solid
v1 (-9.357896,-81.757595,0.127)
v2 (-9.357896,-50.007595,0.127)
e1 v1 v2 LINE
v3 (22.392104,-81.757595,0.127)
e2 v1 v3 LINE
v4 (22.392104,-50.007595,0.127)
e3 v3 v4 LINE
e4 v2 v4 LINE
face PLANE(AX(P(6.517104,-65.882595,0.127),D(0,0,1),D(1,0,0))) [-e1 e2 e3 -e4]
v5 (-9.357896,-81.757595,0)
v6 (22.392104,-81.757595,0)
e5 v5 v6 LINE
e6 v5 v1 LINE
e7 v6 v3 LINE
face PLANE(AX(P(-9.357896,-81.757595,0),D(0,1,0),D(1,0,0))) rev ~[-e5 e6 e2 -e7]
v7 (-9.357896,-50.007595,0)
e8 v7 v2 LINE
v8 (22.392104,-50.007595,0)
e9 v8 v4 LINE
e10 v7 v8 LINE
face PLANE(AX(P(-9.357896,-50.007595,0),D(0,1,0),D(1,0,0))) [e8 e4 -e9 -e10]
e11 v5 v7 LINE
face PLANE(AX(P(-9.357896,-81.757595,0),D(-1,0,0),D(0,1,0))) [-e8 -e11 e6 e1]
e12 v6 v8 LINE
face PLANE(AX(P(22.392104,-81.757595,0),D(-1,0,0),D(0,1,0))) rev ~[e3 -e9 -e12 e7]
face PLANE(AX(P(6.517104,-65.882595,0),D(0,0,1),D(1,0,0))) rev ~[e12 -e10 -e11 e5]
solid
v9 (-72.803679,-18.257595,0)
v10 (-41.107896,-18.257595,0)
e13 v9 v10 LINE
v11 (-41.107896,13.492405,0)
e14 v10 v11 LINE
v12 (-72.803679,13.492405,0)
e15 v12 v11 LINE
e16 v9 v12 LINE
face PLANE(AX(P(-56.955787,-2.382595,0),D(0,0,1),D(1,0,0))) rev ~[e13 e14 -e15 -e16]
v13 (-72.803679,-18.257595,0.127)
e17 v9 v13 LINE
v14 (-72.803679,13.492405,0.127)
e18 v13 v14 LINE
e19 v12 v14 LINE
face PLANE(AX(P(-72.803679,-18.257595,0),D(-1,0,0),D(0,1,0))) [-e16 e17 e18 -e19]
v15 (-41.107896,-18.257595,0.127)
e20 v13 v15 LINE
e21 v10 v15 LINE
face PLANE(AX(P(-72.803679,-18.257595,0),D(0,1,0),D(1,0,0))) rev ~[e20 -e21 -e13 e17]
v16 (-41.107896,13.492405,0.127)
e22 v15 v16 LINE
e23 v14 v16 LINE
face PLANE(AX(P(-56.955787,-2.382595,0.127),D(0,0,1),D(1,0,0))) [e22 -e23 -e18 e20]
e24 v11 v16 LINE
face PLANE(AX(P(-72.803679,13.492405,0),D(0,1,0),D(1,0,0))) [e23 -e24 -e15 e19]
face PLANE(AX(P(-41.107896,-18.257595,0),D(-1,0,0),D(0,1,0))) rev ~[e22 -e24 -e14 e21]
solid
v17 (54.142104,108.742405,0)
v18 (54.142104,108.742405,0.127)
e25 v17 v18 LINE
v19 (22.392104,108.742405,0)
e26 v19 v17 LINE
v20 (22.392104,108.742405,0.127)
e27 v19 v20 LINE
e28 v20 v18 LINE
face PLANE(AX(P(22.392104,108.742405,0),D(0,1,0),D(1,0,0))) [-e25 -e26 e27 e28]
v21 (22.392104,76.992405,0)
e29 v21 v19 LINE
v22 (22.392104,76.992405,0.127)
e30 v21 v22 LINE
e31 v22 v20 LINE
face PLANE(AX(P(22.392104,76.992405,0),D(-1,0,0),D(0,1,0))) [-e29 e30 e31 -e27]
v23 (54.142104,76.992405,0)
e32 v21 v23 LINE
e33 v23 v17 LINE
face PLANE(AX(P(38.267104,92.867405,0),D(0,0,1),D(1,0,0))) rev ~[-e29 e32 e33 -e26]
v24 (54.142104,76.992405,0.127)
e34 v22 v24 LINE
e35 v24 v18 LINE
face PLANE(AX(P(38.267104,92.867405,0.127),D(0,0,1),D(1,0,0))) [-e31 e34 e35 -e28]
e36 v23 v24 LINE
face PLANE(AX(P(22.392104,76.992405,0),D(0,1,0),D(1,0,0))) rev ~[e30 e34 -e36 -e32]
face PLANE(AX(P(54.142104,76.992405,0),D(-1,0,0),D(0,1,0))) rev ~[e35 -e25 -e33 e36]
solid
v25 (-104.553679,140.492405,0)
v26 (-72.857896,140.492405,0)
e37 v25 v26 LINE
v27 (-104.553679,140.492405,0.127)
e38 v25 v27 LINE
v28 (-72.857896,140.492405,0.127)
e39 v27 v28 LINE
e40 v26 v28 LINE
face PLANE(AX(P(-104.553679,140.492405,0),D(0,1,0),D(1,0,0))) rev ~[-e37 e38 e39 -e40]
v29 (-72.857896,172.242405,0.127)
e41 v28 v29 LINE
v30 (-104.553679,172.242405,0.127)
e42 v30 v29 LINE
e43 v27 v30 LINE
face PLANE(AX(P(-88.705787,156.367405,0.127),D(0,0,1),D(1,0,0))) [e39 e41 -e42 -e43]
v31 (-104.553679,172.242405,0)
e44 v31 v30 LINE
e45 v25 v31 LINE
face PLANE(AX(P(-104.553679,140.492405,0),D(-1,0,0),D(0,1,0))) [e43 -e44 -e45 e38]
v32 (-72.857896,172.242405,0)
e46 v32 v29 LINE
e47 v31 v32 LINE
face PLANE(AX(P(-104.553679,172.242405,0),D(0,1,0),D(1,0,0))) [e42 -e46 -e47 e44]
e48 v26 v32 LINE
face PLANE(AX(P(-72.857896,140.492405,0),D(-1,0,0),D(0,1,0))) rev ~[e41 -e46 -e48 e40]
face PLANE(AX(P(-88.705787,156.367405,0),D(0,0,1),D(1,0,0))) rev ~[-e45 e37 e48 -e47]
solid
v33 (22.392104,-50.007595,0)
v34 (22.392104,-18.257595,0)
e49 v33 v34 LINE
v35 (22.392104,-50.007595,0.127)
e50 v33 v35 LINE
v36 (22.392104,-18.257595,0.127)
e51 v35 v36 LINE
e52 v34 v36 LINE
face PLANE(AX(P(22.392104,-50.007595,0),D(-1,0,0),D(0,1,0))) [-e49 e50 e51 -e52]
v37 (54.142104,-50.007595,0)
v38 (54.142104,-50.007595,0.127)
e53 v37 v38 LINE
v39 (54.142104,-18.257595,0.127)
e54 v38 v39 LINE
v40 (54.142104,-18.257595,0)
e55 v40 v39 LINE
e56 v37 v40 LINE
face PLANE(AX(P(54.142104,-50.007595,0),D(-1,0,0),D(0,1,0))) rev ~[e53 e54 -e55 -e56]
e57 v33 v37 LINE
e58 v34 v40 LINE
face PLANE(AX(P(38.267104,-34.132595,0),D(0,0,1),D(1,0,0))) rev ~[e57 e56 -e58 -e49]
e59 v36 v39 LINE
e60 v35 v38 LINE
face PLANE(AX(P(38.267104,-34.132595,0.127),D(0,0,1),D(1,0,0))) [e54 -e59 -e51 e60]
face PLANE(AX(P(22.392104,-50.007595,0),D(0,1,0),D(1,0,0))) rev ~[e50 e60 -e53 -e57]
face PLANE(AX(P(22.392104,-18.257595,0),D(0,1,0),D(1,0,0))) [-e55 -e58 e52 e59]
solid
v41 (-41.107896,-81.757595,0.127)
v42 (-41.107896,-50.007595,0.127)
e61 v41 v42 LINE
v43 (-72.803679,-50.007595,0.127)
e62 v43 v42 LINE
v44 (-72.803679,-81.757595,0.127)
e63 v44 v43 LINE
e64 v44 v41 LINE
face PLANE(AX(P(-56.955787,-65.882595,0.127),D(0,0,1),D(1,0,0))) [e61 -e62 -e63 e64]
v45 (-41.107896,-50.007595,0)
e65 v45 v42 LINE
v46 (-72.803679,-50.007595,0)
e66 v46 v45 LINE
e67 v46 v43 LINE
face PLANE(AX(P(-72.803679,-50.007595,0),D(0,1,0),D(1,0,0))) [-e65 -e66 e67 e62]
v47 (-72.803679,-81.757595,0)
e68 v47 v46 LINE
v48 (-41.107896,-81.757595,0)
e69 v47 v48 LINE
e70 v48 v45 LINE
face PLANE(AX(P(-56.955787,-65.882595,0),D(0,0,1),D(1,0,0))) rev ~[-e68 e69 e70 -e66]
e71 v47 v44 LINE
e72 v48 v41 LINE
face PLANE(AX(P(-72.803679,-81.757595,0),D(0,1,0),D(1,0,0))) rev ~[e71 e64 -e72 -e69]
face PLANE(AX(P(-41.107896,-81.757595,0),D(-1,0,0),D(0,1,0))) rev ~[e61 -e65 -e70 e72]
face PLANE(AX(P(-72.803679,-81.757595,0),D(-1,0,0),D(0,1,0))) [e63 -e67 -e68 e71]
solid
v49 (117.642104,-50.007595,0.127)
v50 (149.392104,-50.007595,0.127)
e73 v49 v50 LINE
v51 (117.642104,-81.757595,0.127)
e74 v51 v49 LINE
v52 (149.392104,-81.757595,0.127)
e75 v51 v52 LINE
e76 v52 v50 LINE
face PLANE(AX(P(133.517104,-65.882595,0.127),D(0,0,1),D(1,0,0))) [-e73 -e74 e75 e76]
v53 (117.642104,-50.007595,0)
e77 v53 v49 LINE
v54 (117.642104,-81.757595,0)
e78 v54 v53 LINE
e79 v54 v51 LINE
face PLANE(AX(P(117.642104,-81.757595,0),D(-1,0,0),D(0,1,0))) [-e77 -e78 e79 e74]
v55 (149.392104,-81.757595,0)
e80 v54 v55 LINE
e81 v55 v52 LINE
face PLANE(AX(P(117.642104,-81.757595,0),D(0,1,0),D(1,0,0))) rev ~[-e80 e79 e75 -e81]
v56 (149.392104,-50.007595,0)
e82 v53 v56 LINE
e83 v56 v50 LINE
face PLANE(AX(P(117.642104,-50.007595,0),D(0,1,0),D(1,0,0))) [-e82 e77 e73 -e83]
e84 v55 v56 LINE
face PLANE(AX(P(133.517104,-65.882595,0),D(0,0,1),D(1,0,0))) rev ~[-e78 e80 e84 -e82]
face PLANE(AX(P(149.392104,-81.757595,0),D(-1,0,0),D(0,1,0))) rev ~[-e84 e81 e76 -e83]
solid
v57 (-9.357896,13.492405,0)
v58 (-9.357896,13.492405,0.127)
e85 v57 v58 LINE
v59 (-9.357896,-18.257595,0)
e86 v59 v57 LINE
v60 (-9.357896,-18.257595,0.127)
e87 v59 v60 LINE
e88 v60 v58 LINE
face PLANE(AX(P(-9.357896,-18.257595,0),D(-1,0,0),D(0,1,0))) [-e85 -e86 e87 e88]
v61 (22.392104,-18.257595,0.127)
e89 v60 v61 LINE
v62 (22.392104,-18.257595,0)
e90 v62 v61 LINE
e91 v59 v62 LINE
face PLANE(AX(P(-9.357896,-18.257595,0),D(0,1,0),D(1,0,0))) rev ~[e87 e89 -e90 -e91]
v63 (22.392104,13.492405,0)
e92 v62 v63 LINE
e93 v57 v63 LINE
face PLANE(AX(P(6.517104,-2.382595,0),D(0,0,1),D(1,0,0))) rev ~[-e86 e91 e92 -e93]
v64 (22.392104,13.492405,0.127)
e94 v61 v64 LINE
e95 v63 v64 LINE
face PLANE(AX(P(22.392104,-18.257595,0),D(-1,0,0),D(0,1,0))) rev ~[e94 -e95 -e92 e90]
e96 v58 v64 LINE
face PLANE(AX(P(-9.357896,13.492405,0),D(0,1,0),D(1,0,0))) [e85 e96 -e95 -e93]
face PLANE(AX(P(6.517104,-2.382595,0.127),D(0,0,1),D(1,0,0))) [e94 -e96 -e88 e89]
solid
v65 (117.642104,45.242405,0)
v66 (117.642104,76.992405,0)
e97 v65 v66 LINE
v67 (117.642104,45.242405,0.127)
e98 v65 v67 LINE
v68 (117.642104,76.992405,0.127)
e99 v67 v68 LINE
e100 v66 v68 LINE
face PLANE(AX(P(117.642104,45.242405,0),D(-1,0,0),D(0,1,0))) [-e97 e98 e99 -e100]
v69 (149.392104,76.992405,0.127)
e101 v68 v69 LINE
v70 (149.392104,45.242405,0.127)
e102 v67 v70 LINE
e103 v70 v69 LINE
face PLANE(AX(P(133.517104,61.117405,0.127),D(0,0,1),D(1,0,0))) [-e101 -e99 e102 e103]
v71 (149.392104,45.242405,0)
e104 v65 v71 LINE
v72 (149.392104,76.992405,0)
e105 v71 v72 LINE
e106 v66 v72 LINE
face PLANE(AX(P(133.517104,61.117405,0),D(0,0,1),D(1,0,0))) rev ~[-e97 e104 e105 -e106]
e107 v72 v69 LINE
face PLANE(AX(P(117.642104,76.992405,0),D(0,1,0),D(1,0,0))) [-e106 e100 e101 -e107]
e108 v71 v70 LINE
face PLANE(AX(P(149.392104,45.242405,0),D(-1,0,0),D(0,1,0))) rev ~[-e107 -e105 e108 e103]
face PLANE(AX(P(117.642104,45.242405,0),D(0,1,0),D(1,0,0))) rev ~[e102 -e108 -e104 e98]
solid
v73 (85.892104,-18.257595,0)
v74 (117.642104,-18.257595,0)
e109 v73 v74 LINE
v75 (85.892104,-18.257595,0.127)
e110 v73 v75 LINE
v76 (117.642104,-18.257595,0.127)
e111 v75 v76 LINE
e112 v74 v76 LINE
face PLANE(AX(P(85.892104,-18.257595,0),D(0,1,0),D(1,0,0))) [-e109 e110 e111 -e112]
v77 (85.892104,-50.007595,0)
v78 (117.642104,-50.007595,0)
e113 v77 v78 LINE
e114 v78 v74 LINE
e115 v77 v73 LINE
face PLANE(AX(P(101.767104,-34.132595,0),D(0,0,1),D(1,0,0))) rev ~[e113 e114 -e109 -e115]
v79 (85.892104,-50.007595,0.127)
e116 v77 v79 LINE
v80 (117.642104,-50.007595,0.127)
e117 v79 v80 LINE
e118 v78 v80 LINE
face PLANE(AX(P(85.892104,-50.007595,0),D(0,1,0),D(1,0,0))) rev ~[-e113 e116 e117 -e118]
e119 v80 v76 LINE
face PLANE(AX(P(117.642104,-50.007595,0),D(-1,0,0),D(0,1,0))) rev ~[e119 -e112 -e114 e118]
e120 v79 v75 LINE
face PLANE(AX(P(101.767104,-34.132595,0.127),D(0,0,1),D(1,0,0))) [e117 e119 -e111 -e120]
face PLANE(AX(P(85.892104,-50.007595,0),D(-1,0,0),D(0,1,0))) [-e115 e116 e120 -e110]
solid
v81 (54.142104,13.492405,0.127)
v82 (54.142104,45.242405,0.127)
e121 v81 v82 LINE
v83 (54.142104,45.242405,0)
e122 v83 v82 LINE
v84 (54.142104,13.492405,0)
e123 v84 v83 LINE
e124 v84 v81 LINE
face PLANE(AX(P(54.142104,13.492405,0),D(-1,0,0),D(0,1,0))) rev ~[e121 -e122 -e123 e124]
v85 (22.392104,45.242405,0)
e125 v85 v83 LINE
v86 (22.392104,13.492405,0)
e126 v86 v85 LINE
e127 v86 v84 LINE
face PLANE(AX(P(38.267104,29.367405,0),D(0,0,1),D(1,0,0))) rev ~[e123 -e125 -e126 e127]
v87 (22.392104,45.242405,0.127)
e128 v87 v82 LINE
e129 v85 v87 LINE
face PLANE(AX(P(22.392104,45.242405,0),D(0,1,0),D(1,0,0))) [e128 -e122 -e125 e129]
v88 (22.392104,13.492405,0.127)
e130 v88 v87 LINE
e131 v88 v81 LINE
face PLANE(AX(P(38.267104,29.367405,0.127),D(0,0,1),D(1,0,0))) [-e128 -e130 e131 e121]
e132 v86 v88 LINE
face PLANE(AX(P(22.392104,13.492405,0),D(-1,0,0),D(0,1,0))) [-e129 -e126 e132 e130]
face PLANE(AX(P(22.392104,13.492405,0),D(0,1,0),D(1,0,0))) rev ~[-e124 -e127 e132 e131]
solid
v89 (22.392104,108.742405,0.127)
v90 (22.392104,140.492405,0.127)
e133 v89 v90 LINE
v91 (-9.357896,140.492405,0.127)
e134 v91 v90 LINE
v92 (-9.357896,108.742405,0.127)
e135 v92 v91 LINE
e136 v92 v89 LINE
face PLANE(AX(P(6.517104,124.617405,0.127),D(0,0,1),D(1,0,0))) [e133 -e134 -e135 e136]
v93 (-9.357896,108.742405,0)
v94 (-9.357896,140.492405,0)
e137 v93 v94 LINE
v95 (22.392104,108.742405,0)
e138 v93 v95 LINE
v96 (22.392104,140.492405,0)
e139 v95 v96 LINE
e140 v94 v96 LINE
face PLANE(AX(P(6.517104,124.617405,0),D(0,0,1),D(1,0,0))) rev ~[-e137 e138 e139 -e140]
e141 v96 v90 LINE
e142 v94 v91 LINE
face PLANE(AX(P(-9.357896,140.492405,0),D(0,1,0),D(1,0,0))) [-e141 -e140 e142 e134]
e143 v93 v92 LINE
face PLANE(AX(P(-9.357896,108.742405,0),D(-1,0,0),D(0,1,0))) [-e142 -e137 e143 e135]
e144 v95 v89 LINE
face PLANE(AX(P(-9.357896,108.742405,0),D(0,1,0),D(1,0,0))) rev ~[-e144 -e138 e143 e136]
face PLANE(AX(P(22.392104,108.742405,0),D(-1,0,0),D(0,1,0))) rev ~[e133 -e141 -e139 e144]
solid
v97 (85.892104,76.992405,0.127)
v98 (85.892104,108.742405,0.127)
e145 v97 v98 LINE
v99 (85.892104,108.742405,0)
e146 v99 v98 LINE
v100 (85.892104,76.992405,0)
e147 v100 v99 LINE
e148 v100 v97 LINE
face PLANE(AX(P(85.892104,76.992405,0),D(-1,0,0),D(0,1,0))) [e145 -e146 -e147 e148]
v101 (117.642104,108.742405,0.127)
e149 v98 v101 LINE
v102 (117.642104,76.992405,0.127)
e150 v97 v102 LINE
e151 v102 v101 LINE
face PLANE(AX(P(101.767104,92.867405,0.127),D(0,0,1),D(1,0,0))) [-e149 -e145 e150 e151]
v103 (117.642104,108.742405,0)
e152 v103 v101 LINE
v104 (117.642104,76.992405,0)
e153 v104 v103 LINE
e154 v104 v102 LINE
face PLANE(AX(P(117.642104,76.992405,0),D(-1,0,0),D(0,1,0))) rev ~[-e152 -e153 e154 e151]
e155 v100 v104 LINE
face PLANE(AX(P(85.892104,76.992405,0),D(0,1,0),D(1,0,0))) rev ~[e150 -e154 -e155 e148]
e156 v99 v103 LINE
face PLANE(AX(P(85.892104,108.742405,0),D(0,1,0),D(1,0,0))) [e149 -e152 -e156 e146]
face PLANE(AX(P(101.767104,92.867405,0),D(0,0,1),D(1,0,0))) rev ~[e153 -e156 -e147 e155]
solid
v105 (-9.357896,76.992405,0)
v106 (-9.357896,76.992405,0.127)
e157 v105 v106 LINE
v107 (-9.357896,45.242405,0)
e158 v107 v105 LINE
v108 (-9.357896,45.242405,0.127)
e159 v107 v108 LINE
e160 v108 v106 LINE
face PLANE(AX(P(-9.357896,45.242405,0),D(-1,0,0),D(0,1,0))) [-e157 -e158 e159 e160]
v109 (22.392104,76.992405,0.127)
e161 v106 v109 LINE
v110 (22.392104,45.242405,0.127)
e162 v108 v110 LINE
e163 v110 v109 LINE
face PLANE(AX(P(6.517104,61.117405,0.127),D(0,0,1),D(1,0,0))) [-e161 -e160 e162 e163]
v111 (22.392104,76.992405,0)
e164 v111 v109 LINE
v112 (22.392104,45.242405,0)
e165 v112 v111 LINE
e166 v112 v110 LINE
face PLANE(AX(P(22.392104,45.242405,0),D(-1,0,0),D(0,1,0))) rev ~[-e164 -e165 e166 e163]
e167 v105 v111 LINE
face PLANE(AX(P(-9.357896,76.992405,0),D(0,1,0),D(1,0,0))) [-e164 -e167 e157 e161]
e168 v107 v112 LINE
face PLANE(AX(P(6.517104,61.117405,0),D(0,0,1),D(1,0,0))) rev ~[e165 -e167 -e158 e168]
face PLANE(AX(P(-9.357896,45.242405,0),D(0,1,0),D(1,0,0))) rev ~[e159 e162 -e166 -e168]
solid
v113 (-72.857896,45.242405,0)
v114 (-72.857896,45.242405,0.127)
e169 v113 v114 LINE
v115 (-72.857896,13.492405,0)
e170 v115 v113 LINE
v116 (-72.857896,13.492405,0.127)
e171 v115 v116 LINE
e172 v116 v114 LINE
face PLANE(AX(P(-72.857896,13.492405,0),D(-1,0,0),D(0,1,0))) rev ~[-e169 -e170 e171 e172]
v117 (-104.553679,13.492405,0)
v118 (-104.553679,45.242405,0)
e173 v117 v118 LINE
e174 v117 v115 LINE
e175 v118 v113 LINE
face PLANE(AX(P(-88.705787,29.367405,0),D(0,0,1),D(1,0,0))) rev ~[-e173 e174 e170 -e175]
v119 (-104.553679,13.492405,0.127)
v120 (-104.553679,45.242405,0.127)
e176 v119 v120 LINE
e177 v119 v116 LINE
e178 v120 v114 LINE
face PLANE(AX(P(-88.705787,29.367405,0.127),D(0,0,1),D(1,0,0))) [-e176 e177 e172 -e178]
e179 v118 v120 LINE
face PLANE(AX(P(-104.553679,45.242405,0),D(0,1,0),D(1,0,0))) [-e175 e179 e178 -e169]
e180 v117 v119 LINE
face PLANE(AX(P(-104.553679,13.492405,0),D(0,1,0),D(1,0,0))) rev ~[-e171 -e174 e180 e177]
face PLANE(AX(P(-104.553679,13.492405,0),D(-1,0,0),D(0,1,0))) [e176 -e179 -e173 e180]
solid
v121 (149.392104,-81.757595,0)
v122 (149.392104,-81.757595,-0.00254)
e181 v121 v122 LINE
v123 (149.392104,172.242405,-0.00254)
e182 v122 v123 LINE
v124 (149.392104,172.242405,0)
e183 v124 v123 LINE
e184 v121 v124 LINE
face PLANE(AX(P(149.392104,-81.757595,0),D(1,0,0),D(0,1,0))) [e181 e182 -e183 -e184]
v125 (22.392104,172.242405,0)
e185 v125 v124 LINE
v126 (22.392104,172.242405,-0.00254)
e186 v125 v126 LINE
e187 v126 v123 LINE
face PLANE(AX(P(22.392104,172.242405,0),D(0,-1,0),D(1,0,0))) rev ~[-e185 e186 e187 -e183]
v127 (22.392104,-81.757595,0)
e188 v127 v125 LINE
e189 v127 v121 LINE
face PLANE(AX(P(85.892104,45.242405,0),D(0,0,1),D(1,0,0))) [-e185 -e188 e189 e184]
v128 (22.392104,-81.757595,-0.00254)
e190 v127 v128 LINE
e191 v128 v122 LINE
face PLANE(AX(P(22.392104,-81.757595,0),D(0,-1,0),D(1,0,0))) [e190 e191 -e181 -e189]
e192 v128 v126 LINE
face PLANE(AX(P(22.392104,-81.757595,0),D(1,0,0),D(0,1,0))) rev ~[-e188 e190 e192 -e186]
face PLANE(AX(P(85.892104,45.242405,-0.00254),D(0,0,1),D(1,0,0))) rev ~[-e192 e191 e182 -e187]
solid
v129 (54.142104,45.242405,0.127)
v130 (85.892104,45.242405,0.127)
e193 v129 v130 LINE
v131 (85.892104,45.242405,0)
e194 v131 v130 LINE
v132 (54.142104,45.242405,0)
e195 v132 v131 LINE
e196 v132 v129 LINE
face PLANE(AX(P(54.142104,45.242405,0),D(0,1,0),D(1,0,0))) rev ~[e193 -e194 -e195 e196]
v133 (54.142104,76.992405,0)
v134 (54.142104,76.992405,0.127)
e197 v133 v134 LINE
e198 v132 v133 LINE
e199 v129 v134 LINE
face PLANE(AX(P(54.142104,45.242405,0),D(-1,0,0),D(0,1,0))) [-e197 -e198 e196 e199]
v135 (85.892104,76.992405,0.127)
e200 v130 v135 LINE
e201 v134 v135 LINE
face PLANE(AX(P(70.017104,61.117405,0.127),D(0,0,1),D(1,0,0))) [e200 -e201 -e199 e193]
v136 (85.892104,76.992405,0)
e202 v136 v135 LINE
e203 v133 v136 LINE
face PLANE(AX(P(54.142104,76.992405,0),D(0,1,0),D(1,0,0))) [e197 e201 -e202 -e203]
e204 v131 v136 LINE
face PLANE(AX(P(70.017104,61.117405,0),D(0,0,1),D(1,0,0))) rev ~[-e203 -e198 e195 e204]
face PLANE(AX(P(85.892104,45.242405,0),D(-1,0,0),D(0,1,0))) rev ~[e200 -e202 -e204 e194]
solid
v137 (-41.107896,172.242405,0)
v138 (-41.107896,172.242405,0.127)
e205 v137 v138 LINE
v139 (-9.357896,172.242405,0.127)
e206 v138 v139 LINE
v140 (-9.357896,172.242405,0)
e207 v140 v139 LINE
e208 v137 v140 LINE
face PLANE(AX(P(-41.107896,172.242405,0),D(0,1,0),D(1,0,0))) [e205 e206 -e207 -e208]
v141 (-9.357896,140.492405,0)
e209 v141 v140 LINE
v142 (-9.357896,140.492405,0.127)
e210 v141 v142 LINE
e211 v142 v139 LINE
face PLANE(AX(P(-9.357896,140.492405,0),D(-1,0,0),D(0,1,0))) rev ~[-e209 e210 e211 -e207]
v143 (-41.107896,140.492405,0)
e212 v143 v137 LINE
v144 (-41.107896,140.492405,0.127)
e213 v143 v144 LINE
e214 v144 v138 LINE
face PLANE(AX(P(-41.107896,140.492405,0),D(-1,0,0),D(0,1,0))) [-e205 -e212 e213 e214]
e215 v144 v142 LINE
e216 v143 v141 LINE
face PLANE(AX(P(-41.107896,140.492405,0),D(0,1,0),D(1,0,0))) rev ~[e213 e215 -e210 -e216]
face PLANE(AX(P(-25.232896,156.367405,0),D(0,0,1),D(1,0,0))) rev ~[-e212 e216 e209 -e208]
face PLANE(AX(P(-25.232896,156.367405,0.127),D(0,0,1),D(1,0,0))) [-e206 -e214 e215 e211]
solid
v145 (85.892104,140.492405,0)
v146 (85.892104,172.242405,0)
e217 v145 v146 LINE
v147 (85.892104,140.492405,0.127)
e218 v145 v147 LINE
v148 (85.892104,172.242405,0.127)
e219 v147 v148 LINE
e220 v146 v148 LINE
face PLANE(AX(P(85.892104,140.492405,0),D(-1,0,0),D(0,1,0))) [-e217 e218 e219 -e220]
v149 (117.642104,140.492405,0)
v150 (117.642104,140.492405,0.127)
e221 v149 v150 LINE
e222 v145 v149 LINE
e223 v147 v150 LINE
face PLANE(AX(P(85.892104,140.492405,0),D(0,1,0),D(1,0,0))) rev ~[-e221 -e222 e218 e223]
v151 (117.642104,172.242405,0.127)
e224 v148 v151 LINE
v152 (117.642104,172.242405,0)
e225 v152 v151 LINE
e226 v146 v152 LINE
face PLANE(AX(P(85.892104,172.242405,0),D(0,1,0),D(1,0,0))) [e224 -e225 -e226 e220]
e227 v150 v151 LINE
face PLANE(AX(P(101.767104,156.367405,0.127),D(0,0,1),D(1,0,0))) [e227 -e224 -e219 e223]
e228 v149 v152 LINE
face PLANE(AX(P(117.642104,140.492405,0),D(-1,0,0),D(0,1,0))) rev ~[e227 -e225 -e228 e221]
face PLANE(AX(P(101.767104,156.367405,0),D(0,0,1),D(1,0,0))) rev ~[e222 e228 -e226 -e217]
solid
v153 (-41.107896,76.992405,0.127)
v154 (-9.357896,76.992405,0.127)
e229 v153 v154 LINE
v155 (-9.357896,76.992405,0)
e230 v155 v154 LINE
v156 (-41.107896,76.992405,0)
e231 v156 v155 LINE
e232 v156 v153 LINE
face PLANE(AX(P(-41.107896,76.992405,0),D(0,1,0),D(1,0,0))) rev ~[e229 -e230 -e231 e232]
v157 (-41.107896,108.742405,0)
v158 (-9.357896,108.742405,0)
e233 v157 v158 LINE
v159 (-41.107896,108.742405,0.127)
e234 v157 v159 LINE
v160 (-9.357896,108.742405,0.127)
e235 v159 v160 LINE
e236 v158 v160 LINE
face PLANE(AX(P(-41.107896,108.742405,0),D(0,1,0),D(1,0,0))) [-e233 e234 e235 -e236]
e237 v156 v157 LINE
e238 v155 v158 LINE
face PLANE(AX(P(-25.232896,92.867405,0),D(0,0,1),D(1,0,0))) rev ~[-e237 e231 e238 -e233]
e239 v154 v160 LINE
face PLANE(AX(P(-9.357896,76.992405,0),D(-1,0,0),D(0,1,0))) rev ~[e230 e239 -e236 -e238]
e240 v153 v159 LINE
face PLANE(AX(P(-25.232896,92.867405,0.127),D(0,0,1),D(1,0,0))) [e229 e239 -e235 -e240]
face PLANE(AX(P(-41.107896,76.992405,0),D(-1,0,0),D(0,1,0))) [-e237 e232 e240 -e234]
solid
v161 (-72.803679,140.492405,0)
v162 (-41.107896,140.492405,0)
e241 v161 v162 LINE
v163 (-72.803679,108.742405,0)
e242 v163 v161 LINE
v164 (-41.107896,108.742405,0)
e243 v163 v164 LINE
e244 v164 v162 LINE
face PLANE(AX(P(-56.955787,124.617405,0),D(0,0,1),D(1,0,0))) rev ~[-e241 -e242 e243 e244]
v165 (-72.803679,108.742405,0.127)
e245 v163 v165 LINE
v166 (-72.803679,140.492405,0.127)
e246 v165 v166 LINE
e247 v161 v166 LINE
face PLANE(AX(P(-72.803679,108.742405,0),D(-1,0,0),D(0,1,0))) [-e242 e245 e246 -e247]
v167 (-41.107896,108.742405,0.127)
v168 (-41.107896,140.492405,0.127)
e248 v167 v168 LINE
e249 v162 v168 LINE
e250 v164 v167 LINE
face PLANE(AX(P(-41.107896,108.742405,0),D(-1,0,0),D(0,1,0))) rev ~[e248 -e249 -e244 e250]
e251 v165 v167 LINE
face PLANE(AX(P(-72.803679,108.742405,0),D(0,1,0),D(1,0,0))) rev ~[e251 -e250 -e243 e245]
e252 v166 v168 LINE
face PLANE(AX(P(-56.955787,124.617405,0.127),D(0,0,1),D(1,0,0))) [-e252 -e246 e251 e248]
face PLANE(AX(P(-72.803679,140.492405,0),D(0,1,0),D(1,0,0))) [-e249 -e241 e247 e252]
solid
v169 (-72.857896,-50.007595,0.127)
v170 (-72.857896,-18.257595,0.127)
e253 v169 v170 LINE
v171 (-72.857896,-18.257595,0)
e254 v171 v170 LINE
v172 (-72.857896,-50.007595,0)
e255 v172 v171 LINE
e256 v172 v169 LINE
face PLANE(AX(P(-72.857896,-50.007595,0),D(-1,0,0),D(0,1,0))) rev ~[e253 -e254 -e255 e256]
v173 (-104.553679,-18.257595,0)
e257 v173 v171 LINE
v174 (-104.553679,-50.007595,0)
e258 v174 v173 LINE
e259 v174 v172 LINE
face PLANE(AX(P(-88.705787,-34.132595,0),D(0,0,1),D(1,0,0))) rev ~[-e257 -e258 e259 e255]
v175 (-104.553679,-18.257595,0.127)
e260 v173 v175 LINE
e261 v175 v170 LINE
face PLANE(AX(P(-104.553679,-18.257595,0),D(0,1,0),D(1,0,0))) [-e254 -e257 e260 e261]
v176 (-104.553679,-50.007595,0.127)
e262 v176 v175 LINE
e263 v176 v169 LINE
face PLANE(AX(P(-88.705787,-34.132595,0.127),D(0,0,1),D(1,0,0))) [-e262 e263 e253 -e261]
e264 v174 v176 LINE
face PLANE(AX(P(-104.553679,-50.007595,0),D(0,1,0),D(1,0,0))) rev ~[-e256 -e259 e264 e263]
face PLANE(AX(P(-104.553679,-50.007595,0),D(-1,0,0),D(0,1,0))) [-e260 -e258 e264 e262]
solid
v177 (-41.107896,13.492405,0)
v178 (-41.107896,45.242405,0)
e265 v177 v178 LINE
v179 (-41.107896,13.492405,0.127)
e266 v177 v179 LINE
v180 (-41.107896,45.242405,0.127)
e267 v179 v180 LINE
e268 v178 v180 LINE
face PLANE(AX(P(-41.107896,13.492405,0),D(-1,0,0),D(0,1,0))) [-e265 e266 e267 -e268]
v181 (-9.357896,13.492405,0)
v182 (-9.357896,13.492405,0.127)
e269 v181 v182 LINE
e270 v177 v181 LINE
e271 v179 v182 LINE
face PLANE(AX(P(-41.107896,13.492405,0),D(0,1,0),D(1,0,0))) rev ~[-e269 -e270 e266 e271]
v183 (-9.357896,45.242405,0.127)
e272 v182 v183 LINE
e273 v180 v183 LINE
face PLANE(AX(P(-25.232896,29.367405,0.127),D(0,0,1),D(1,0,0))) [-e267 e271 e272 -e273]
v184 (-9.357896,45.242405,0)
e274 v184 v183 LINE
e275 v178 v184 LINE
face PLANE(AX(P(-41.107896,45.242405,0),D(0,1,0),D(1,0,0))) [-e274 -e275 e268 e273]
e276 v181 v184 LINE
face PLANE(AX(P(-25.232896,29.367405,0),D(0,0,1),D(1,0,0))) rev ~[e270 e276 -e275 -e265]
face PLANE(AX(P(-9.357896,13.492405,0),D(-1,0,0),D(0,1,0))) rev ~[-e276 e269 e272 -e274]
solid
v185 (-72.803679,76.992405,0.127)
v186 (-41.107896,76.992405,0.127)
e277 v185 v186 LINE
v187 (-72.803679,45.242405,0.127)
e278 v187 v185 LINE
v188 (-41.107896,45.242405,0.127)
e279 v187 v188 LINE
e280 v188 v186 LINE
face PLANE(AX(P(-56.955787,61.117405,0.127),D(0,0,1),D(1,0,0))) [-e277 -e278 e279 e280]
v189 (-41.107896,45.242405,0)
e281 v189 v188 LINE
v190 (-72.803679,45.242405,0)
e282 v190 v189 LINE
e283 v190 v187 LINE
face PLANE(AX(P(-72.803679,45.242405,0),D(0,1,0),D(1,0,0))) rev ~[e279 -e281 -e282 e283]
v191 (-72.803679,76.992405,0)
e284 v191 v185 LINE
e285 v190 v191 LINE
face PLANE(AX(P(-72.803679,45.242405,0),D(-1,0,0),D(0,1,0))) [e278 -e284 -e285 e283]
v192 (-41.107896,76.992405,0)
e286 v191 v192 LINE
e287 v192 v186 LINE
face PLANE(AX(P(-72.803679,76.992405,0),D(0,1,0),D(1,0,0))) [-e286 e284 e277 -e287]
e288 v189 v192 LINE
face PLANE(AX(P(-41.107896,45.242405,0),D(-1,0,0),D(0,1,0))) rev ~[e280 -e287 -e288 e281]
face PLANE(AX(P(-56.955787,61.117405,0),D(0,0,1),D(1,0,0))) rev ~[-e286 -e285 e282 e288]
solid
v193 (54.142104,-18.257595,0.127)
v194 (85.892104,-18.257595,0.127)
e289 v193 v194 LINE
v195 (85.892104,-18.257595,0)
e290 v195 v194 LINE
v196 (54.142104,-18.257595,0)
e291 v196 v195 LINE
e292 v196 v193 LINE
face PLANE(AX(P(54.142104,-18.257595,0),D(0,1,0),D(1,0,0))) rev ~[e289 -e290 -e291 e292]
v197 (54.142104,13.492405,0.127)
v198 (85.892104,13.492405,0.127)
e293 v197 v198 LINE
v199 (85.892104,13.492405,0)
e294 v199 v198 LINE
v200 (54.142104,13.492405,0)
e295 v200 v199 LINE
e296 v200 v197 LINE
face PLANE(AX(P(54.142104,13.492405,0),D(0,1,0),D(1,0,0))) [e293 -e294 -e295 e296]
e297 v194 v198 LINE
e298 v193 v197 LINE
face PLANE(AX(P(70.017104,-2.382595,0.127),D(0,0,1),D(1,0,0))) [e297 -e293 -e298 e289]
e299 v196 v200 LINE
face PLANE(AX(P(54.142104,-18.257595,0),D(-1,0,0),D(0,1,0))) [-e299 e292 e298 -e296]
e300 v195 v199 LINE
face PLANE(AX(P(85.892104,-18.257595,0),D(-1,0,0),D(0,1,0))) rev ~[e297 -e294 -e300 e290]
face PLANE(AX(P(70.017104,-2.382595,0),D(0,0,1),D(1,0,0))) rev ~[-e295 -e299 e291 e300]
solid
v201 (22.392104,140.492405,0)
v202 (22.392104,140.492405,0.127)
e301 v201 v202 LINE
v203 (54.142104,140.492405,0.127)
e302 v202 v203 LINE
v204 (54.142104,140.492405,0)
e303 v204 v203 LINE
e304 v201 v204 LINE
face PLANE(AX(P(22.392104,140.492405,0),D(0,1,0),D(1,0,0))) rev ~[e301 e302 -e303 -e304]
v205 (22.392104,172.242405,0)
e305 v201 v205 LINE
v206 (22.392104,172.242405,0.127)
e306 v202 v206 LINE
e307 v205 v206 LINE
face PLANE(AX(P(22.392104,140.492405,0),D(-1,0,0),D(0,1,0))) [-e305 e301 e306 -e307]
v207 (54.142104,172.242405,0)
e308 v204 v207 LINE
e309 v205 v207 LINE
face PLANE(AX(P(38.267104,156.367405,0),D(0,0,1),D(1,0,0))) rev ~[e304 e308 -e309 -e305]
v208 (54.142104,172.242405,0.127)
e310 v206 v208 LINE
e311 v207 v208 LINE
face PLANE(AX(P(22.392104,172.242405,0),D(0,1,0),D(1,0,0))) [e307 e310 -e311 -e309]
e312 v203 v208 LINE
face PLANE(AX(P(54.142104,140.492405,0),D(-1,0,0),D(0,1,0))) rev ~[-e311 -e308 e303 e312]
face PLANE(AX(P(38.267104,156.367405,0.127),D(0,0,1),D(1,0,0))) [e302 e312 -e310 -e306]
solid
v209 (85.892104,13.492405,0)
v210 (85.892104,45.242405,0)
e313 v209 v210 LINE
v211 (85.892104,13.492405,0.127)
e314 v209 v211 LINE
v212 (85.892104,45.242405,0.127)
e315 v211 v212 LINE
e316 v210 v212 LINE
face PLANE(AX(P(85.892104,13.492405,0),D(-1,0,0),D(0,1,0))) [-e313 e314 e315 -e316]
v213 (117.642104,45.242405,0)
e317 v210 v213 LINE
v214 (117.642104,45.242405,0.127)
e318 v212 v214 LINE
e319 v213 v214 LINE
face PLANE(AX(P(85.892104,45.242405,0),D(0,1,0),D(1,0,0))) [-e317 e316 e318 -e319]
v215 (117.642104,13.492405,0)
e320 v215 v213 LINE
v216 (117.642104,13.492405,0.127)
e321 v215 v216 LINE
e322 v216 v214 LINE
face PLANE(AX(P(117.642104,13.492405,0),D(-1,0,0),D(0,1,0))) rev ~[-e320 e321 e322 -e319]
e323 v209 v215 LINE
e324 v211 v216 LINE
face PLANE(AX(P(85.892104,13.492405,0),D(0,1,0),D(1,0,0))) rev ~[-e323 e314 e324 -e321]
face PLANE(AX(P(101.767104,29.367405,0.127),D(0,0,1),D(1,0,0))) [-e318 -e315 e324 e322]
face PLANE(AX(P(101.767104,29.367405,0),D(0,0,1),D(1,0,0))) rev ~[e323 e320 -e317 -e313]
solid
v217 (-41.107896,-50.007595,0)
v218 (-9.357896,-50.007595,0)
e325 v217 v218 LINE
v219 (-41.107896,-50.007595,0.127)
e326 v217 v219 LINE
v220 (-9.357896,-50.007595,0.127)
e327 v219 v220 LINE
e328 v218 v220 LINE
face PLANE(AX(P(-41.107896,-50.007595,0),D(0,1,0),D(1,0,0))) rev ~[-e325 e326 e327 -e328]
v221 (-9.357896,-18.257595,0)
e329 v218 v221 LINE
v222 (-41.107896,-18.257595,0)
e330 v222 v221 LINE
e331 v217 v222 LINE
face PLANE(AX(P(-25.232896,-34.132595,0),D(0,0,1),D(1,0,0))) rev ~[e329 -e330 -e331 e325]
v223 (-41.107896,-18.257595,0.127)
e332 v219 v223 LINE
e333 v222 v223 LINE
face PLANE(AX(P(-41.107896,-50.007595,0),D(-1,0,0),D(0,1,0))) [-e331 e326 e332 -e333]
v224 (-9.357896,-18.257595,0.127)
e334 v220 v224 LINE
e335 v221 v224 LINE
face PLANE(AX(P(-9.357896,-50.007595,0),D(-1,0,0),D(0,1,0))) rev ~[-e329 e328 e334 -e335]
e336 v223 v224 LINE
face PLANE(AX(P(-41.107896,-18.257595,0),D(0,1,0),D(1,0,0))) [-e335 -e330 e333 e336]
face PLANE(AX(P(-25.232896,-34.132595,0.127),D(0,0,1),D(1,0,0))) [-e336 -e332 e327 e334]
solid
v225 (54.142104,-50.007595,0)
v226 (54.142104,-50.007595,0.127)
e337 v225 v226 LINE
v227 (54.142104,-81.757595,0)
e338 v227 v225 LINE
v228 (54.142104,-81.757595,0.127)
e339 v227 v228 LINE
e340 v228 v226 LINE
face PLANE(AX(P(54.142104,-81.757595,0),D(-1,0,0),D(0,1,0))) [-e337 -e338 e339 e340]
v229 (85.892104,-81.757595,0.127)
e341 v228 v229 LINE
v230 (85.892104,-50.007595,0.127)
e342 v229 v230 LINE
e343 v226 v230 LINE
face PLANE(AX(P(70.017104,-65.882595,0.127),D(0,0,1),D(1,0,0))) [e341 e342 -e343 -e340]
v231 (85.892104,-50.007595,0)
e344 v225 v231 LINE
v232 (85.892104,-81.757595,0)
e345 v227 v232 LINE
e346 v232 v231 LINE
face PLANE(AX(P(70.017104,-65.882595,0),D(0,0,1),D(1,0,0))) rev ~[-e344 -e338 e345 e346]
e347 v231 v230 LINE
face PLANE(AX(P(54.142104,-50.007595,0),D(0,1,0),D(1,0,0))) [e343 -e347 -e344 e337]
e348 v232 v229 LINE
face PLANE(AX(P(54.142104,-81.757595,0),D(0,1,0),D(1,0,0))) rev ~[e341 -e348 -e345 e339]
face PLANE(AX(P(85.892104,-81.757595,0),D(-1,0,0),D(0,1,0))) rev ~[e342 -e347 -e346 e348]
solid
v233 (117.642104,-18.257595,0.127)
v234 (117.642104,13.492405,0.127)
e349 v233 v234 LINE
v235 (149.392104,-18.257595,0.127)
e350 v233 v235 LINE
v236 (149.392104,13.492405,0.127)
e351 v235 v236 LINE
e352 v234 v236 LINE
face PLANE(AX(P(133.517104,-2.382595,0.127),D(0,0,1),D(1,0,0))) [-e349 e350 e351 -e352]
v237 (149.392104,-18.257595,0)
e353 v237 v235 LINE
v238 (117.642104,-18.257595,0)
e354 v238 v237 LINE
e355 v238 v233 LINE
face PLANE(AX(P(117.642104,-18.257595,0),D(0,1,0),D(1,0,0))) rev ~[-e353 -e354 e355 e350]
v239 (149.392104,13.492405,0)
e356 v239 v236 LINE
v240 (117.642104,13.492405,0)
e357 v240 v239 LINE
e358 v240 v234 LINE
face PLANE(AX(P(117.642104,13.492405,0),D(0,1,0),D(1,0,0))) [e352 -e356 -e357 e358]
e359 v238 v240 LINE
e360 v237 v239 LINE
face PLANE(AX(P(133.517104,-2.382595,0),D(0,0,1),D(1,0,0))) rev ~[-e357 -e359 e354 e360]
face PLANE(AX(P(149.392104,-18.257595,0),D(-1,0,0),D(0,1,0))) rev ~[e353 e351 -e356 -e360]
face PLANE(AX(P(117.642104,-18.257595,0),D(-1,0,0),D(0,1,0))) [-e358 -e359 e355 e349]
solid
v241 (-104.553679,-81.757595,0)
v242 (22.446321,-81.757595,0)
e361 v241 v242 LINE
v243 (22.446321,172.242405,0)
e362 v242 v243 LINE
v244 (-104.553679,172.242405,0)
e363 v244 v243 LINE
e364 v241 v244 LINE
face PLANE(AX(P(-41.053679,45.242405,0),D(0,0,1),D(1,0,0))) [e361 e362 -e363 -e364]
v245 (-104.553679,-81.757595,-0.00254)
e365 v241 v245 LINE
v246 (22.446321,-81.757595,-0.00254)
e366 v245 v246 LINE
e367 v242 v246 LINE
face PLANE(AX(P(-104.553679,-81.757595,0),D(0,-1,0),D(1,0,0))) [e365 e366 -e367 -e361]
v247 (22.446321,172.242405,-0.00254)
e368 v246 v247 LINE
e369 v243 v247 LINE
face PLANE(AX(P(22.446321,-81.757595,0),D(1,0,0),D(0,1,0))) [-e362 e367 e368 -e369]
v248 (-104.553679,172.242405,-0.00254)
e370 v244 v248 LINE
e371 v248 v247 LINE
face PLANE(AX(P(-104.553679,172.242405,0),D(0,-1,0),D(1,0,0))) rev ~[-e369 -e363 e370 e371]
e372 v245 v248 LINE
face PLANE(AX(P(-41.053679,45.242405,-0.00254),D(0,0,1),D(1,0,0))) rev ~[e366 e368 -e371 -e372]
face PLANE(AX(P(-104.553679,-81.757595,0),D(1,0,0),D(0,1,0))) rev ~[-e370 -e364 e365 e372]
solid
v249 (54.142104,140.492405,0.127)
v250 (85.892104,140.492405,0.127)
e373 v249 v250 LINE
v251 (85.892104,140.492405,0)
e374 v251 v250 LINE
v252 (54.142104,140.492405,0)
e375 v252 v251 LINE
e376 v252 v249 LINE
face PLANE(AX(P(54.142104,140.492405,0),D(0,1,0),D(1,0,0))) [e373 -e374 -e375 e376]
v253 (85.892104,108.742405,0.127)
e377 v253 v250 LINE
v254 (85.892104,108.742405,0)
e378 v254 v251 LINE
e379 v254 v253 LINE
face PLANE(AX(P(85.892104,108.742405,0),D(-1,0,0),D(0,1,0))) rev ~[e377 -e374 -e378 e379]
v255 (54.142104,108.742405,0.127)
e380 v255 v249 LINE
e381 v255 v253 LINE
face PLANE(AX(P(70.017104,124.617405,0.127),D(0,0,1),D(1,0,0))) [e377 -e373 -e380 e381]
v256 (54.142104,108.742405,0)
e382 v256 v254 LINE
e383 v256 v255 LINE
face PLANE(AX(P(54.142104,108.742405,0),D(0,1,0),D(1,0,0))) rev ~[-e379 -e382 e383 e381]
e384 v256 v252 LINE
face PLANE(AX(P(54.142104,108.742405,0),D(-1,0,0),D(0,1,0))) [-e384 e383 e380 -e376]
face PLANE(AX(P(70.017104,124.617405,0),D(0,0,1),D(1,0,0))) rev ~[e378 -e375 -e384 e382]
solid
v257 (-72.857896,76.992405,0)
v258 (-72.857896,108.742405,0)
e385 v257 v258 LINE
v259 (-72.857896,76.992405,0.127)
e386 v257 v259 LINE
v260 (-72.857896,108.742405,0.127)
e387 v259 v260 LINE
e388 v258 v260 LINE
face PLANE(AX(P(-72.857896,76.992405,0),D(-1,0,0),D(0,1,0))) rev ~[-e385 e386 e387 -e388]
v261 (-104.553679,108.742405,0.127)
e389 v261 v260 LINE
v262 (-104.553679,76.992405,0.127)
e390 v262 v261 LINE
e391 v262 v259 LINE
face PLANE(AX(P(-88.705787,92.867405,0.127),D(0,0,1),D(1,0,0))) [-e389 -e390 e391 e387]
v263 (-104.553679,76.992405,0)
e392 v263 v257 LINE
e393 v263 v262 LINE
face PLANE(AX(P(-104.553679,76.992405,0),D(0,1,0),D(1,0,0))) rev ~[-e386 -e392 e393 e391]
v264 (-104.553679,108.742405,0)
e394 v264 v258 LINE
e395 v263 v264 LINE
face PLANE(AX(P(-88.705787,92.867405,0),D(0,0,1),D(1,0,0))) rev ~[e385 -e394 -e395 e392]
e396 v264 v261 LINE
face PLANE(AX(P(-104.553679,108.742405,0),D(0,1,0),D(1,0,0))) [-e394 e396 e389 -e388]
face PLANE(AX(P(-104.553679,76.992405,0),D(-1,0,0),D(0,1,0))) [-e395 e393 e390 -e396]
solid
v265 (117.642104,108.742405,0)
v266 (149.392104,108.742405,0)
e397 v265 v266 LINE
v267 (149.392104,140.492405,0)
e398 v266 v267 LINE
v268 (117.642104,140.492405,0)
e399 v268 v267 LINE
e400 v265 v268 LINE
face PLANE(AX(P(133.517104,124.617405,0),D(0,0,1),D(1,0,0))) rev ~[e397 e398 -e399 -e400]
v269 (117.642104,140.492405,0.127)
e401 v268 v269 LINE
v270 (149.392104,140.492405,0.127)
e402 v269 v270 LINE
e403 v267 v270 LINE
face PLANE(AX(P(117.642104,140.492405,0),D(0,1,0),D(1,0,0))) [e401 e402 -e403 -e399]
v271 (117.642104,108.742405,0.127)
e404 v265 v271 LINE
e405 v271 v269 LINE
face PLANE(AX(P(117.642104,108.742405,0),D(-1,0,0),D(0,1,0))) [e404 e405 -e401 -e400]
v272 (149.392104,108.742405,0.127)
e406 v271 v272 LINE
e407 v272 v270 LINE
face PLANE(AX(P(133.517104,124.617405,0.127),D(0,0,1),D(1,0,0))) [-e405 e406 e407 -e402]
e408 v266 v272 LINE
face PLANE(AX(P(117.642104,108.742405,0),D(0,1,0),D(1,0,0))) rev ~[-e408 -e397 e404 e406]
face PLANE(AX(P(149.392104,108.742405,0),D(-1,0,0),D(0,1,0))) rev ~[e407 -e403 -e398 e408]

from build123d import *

# Parameters (mm, degrees)
F0_W     = 31.6957823275
F0_H     = 31.75
F1_DEPTH = 0.127
F0_W_2   = 31.75
F2_W     = 127
F2_H     = 254
F3_DEPTH = 0.00254
F4_W     = 127
F4_H     = 254
F5_DEPTH = 0.00254


with BuildPart() as f1:
    # F0 (on Top) → F1 (new body)
    with BuildSketch(Plane.XY):
        with Locations((-88.7057874083, 156.3674052)):
            Rectangle(F0_W, F0_H)
    extrude(amount=F1_DEPTH)


with BuildPart() as f1b:
    # F0 (on Top) → F1, piece 2 (new body)
    with BuildSketch(Plane.XY):
        with Locations((-56.9557874083, 124.6174052)):
            Rectangle(F0_W, F0_H)
    extrude(amount=F1_DEPTH)


with BuildPart() as f1c:
    # F0 (on Top) → F1, piece 3 (new body)
    with BuildSketch(Plane.XY):
        with Locations((-25.2328962445, 156.3674052)):
            Rectangle(F0_W_2, F0_H)
    extrude(amount=F1_DEPTH)


with BuildPart() as f1d:
    # F0 (on Top) → F1, piece 4 (new body)
    with BuildSketch(Plane.XY):
        with Locations((6.5171037555, 124.6174052)):
            Rectangle(F0_W_2, F0_H)
    extrude(amount=F1_DEPTH)


with BuildPart() as f1e:
    # F0 (on Top) → F1, piece 5 (new body)
    with BuildSketch(Plane.XY):
        with Locations((38.2671037555, 156.3674052)):
            Rectangle(F0_W_2, F0_H)
    extrude(amount=F1_DEPTH)


with BuildPart() as f1f:
    # F0 (on Top) → F1, piece 6 (new body)
    with BuildSketch(Plane.XY):
        with Locations((70.0171037555, 124.6174052)):
            Rectangle(F0_W_2, F0_H)
    extrude(amount=F1_DEPTH)


with BuildPart() as f1g:
    # F0 (on Top) → F1, piece 7 (new body)
    with BuildSketch(Plane.XY):
        with Locations((101.7671037555, 156.3674052)):
            Rectangle(F0_W_2, F0_H)
    extrude(amount=F1_DEPTH)


with BuildPart() as f1h:
    # F0 (on Top) → F1, piece 8 (new body)
    with BuildSketch(Plane.XY):
        with Locations((133.5171037555, 124.6174052)):
            Rectangle(F0_W_2, F0_H)
    extrude(amount=F1_DEPTH)


with BuildPart() as f1i:
    # F0 (on Top) → F1, piece 9 (new body)
    with BuildSketch(Plane.XY):
        with Locations((101.7671037555, 92.8674052)):
            Rectangle(F0_W_2, F0_H)
    extrude(amount=F1_DEPTH)


with BuildPart() as f1j:
    # F0 (on Top) → F1, piece 10 (new body)
    with BuildSketch(Plane.XY):
        with Locations((70.0171037555, 61.1174052)):
            Rectangle(F0_W_2, F0_H)
    extrude(amount=F1_DEPTH)


with BuildPart() as f1k:
    # F0 (on Top) → F1, piece 11 (new body)
    with BuildSketch(Plane.XY):
        with Locations((38.2671037555, 92.8674052)):
            Rectangle(F0_W_2, F0_H)
    extrude(amount=F1_DEPTH)


with BuildPart() as f1l:
    # F0 (on Top) → F1, piece 12 (new body)
    with BuildSketch(Plane.XY):
        with Locations((6.5171037555, 61.1174052)):
            Rectangle(F0_W_2, F0_H)
    extrude(amount=F1_DEPTH)


with BuildPart() as f1m:
    # F0 (on Top) → F1, piece 13 (new body)
    with BuildSketch(Plane.XY):
        with Locations((-25.2328962445, 92.8674052)):
            Rectangle(F0_W_2, F0_H)
    extrude(amount=F1_DEPTH)


with BuildPart() as f1n:
    # F0 (on Top) → F1, piece 14 (new body)
    with BuildSketch(Plane.XY):
        with Locations((-56.9557874083, 61.1174052)):
            Rectangle(F0_W, F0_H)
    extrude(amount=F1_DEPTH)


with BuildPart() as f1o:
    # F0 (on Top) → F1, piece 15 (new body)
    with BuildSketch(Plane.XY):
        with Locations((-88.7057874083, 92.8674052)):
            Rectangle(F0_W, F0_H)
    extrude(amount=F1_DEPTH)


with BuildPart() as f1p:
    # F0 (on Top) → F1, piece 16 (new body)
    with BuildSketch(Plane.XY):
        with Locations((-88.7057874083, 29.3674052)):
            Rectangle(F0_W, F0_H)
    extrude(amount=F1_DEPTH)


with BuildPart() as f1q:
    # F0 (on Top) → F1, piece 17 (new body)
    with BuildSketch(Plane.XY):
        with Locations((-56.9557874083, -2.3825948)):
            Rectangle(F0_W, F0_H)
    extrude(amount=F1_DEPTH)


with BuildPart() as f1r:
    # F0 (on Top) → F1, piece 18 (new body)
    with BuildSketch(Plane.XY):
        with Locations((-25.2328962445, 29.3674052)):
            Rectangle(F0_W_2, F0_H)
    extrude(amount=F1_DEPTH)


with BuildPart() as f1s:
    # F0 (on Top) → F1, piece 19 (new body)
    with BuildSketch(Plane.XY):
        with Locations((6.5171037555, -2.3825948)):
            Rectangle(F0_W_2, F0_H)
    extrude(amount=F1_DEPTH)


with BuildPart() as f1t:
    # F0 (on Top) → F1, piece 20 (new body)
    with BuildSketch(Plane.XY):
        with Locations((38.2671037555, 29.3674052)):
            Rectangle(F0_W_2, F0_H)
    extrude(amount=F1_DEPTH)


with BuildPart() as f1u:
    # F0 (on Top) → F1, piece 21 (new body)
    with BuildSketch(Plane.XY):
        with Locations((70.0171037555, -2.3825948)):
            Rectangle(F0_W_2, F0_H)
    extrude(amount=F1_DEPTH)


with BuildPart() as f1v:
    # F0 (on Top) → F1, piece 22 (new body)
    with BuildSketch(Plane.XY):
        with Locations((101.7671037555, 29.3674052)):
            Rectangle(F0_W_2, F0_H)
    extrude(amount=F1_DEPTH)


with BuildPart() as f1w:
    # F0 (on Top) → F1, piece 23 (new body)
    with BuildSketch(Plane.XY):
        with Locations((133.5171037555, -2.3825948)):
            Rectangle(F0_W_2, F0_H)
    extrude(amount=F1_DEPTH)


with BuildPart() as f1x:
    # F0 (on Top) → F1, piece 24 (new body)
    with BuildSketch(Plane.XY):
        with Locations((133.5171037555, 61.1174052)):
            Rectangle(F0_W_2, F0_H)
    extrude(amount=F1_DEPTH)


with BuildPart() as f1y:
    # F0 (on Top) → F1, piece 25 (new body)
    with BuildSketch(Plane.XY):
        with Locations((-88.7057874083, -34.1325948)):
            Rectangle(F0_W, F0_H)
    extrude(amount=F1_DEPTH)


with BuildPart() as f1z:
    # F0 (on Top) → F1, piece 26 (new body)
    with BuildSketch(Plane.XY):
        with Locations((-56.9557874083, -65.8825948)):
            Rectangle(F0_W, F0_H)
    extrude(amount=F1_DEPTH)


with BuildPart() as f1ba:
    # F0 (on Top) → F1, piece 27 (new body)
    with BuildSketch(Plane.XY):
        with Locations((-25.2328962445, -34.1325948)):
            Rectangle(F0_W_2, F0_H)
    extrude(amount=F1_DEPTH)


with BuildPart() as f1bb:
    # F0 (on Top) → F1, piece 28 (new body)
    with BuildSketch(Plane.XY):
        with Locations((6.5171037555, -65.8825948)):
            Rectangle(F0_W_2, F0_H)
    extrude(amount=F1_DEPTH)


with BuildPart() as f1bc:
    # F0 (on Top) → F1, piece 29 (new body)
    with BuildSketch(Plane.XY):
        with Locations((70.0171037555, -65.8825948)):
            Rectangle(F0_W_2, F0_H)
    extrude(amount=F1_DEPTH)


with BuildPart() as f1bd:
    # F0 (on Top) → F1, piece 30 (new body)
    with BuildSketch(Plane.XY):
        with Locations((133.5171037555, -65.8825948)):
            Rectangle(F0_W_2, F0_H)
    extrude(amount=F1_DEPTH)


with BuildPart() as f1be:
    # F0 (on Top) → F1, piece 31 (new body)
    with BuildSketch(Plane.XY):
        with Locations((38.2671037555, -34.1325948)):
            Rectangle(F0_W_2, F0_H)
    extrude(amount=F1_DEPTH)


with BuildPart() as f1bf:
    # F0 (on Top) → F1, piece 32 (new body)
    with BuildSketch(Plane.XY):
        with Locations((101.7671037555, -34.1325948)):
            Rectangle(F0_W_2, F0_H)
    extrude(amount=F1_DEPTH)


with BuildPart() as f3:
    # F2 (on Top) → F3 (new body)
    with BuildSketch(Plane.XY):
        with Locations((85.8921037555, 45.2424052)):
            Rectangle(F2_W, F2_H)
    extrude(amount=-F3_DEPTH)


with BuildPart() as f5:
    # F4 (on Top) → F5 (new body)
    with BuildSketch(Plane.XY):
        with Locations((-41.0536785721, 45.2424052)):
            Rectangle(F4_W, F4_H)
    extrude(amount=-F5_DEPTH)


solid = Compound([f1.part, f1b.part, f1c.part, f1d.part, f1e.part, f1f.part, f1g.part, f1h.part, f1i.part, f1j.part, f1k.part, f1l.part, f1m.part, f1n.part, f1o.part, f1p.part, f1q.part, f1r.part, f1s.part, f1t.part, f1u.part, f1v.part, f1w.part, f1x.part, f1y.part, f1z.part, f1ba.part, f1bb.part, f1bc.part, f1bd.part, f1be.part, f1bf.part, f3.part, f5.part])
